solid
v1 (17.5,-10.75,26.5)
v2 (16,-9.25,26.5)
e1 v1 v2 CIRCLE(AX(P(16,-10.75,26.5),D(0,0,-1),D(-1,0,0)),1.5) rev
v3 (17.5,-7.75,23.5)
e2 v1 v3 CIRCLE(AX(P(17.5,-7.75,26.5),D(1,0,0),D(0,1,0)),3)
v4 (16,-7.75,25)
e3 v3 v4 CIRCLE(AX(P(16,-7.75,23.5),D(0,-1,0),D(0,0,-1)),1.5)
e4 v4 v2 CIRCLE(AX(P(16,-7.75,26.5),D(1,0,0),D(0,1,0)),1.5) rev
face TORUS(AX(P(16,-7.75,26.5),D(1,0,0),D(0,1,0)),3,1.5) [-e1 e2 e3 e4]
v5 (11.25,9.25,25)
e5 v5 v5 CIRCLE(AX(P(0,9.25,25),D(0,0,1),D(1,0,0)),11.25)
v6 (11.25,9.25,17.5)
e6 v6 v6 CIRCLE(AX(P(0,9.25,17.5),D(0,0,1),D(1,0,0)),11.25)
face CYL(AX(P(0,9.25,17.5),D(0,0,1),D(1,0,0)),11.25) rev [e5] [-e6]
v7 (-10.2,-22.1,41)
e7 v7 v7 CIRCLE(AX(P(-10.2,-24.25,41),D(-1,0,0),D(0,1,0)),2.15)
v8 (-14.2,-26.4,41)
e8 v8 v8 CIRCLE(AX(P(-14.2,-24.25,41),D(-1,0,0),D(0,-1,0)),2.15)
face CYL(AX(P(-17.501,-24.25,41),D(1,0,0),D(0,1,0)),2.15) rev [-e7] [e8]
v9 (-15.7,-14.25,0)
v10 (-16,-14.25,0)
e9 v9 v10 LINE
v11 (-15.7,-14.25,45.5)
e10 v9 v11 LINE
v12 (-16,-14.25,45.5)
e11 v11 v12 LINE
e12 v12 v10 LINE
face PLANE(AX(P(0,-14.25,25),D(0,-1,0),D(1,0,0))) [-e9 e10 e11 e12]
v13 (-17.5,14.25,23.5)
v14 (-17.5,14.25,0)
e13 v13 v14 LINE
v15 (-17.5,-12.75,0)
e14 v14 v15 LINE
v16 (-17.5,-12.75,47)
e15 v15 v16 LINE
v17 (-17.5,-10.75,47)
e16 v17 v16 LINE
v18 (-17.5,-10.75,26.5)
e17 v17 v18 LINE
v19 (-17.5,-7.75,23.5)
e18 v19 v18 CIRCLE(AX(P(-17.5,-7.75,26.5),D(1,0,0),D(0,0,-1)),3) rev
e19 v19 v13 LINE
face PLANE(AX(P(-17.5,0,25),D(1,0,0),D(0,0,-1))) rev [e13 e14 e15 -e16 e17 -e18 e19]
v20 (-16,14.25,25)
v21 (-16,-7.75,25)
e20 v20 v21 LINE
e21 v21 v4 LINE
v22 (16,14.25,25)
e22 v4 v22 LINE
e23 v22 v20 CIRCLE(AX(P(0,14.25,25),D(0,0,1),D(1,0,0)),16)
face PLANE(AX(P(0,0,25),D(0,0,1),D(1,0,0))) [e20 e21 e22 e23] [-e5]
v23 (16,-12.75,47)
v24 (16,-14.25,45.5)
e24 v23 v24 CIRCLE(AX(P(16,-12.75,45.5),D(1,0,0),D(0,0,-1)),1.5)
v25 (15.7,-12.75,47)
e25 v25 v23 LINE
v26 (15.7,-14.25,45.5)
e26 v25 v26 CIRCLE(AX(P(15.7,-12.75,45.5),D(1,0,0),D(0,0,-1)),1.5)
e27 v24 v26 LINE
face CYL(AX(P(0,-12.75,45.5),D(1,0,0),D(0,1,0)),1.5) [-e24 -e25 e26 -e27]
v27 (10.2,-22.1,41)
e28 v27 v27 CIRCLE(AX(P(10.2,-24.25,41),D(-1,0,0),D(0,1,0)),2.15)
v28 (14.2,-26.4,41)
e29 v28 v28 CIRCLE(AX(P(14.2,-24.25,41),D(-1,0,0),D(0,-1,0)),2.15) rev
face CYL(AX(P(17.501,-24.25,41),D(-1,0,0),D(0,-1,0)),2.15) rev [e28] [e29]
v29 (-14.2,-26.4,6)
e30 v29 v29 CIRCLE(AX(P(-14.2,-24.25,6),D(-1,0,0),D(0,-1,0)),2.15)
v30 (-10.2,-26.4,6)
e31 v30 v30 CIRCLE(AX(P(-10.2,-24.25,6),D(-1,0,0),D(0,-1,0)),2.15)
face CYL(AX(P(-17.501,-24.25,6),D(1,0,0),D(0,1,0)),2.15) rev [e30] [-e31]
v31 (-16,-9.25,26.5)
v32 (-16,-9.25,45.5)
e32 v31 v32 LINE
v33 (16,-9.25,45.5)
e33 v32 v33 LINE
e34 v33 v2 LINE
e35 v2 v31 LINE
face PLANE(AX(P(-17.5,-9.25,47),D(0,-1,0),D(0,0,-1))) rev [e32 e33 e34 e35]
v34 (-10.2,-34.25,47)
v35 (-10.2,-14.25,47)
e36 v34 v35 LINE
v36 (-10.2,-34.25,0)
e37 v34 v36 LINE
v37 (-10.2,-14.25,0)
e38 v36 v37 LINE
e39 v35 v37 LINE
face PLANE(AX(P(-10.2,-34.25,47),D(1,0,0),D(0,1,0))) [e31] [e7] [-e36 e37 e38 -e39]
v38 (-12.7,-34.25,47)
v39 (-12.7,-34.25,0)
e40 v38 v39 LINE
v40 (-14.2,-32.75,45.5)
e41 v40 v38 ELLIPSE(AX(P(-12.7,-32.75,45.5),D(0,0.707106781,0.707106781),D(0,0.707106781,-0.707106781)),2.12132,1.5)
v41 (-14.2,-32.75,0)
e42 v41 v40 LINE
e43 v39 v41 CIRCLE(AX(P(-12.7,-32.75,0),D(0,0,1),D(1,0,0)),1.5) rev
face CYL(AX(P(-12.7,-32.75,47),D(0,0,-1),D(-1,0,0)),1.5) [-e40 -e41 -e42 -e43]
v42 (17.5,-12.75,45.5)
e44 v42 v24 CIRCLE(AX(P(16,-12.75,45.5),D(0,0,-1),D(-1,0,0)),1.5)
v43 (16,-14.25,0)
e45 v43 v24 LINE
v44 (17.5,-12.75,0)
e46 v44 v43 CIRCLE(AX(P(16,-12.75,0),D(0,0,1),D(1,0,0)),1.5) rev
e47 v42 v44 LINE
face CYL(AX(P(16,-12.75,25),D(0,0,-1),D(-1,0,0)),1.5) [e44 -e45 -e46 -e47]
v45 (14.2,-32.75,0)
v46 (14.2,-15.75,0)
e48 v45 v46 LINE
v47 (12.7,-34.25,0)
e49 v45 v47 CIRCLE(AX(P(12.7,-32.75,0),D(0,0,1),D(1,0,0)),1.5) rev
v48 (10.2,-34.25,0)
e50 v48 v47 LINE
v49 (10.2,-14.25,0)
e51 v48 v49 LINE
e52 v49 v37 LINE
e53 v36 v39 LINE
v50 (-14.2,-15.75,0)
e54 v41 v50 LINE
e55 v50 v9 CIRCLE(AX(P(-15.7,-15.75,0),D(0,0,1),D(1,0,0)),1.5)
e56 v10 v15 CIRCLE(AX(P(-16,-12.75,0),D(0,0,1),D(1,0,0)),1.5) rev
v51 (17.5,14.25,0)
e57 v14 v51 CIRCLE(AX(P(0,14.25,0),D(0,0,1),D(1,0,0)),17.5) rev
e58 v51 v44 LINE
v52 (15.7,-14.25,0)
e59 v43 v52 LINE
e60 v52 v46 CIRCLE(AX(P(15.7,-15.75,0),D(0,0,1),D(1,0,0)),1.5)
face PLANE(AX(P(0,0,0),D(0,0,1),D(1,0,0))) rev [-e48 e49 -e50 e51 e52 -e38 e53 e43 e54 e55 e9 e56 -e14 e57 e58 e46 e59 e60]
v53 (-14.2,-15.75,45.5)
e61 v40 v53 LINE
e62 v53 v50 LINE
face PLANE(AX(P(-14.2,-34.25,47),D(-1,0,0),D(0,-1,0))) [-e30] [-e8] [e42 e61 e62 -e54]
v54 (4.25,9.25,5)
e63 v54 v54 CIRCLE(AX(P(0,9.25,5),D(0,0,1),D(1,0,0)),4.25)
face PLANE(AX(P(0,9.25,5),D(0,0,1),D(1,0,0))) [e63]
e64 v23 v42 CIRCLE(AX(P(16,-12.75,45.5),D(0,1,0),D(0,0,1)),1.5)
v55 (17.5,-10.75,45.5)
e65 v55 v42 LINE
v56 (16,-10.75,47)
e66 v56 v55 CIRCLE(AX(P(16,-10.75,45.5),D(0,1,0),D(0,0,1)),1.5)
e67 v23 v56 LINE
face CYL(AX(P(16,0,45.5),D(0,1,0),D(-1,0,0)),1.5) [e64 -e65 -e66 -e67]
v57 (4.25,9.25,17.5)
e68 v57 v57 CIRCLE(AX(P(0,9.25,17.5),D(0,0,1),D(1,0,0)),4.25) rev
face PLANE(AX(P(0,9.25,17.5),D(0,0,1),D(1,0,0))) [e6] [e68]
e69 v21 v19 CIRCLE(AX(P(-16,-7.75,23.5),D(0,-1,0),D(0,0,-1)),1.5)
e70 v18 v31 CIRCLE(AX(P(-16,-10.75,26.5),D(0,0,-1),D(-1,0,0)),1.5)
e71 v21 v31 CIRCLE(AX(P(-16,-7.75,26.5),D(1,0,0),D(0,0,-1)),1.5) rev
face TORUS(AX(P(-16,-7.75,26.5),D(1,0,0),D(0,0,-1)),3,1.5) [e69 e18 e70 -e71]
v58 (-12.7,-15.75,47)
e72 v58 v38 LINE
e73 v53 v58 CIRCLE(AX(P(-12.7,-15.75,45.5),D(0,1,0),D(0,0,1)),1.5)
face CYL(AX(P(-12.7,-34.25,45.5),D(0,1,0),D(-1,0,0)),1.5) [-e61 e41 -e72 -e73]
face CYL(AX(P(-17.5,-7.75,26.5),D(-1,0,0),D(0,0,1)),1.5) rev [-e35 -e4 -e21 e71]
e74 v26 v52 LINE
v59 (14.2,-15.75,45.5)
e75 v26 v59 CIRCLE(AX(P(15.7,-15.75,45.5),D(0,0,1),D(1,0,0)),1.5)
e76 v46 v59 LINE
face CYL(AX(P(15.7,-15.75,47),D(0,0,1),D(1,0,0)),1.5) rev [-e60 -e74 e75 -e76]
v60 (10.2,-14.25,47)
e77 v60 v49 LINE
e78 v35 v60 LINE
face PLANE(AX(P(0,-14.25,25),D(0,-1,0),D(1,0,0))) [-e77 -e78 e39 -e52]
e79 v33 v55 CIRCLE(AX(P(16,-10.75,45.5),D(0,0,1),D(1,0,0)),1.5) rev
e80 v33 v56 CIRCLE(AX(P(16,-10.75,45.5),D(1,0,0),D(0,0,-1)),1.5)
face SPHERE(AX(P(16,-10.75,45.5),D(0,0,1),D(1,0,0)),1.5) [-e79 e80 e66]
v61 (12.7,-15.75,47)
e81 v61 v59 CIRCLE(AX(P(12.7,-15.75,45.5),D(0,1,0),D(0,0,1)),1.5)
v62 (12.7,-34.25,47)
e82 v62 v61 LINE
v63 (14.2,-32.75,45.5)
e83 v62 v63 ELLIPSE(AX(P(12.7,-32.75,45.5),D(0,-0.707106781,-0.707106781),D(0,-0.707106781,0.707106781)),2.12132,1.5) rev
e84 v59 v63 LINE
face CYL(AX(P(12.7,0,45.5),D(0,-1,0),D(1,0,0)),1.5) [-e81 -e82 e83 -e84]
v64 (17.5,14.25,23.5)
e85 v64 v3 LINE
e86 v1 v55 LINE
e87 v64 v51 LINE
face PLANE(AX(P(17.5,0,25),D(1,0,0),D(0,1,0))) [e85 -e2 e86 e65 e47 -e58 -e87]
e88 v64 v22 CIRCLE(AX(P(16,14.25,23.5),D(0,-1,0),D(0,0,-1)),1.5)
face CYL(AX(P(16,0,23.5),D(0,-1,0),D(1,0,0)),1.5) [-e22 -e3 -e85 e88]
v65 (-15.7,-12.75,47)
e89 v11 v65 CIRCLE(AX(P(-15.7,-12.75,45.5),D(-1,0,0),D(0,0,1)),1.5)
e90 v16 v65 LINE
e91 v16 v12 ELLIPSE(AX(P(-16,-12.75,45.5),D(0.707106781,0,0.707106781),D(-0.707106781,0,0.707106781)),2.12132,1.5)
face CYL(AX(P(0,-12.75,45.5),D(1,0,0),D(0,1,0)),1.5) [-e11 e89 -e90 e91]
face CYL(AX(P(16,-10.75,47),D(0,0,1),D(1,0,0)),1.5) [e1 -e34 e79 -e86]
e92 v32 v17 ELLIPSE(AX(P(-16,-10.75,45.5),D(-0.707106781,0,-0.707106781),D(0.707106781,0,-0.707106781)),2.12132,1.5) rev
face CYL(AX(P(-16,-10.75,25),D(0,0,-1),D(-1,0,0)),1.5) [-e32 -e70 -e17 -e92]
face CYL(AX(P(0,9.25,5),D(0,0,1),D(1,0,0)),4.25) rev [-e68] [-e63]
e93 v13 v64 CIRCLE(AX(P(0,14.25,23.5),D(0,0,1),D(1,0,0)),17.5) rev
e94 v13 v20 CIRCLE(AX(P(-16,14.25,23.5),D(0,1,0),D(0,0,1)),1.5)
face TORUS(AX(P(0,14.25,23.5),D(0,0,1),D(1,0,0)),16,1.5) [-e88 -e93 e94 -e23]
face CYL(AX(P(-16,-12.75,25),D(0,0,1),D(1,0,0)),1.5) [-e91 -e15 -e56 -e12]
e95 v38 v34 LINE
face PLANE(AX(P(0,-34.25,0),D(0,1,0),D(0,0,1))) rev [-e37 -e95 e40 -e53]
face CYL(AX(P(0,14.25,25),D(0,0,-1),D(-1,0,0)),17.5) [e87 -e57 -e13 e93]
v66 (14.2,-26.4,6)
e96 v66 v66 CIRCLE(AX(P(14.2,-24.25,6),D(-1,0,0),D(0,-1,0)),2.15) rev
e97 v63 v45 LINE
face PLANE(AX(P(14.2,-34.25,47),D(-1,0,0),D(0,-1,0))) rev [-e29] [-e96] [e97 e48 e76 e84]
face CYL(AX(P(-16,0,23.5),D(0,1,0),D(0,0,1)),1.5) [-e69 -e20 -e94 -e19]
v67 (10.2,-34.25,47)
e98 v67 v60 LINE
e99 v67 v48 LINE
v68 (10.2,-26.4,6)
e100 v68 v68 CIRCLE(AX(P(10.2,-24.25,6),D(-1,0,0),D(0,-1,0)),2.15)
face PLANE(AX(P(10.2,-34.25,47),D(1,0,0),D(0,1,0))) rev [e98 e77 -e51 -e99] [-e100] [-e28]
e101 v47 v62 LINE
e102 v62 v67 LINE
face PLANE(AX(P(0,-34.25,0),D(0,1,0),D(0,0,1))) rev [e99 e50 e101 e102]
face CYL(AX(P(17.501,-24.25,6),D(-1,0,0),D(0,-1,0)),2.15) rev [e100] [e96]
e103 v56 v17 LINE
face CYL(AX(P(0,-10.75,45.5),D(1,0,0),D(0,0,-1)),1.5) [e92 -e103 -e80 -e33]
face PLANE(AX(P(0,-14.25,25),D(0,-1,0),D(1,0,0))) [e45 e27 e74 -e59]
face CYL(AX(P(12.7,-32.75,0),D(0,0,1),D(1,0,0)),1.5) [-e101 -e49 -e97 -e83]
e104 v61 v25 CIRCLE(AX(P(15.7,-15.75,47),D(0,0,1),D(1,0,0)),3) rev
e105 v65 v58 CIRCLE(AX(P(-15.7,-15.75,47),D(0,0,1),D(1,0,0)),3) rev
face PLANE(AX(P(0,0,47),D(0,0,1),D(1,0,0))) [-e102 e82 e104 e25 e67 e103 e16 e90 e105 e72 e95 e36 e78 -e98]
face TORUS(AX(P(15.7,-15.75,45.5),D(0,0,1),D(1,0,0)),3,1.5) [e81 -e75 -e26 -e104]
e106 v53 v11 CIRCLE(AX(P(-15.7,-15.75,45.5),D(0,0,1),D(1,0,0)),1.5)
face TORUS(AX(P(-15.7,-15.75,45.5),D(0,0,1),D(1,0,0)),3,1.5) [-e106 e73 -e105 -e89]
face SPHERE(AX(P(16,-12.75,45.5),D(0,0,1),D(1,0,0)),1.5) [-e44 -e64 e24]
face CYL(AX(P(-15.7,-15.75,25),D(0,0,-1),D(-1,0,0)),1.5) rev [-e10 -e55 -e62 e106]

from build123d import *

# Parameters (mm, degrees)
SKETCH1_W           = 35
SKETCH1_H           = 28.5
BOSS_EXTRUDE1_DEPTH = 25
SKETCH2_R           = 4.25
CUT_EXTRUDE1_DEPTH  = 20
SKETCH3_R           = 11.25
CUT_EXTRUDE2_DEPTH  = 7.5
SKETCH9_W           = 35
SKETCH9_H           = 5
BOSS_EXTRUDE4_DEPTH = 22
SKETCH4_W           = 4
SKETCH4_H           = 47
BOSS_EXTRUDE2_DEPTH = 20
FILLET1_R           = 1.5
CUT_EXTRUDE3_REACH  = 66.415
SKETCH6_R           = 2.15
MIRROR1_START       = -14.2
MIRROR1_OUTLINE_W   = 20
MIRROR1_OUTLINE_H   = 47
MIRROR1_OUTLINE_R   = 2.15
MIRROR1_DEPTH       = 4
MIRROR1_2_DEPTH     = 47
FILLET2_R           = 1.5


with BuildPart() as part:
    # Sketch1 → Boss-Extrude1 (new body)
    with BuildSketch(Plane.XY):
        with BuildLine():
            ThreePointArc((-17.5, 14.25), (0, 31.75), (17.5, 14.25))
            Line((17.5, 14.25), (-17.5, 14.25))
        make_face()
        Rectangle(SKETCH1_W, SKETCH1_H)
    extrude(amount=BOSS_EXTRUDE1_DEPTH)

    # Sketch2 → Cut-Extrude1 (cut)
    with BuildSketch(Plane.XY.offset(25)):
        with Locations((0, 9.25)):
            Circle(SKETCH2_R)
    extrude(amount=-CUT_EXTRUDE1_DEPTH, mode=Mode.SUBTRACT)

    # Sketch3 → Cut-Extrude2 (cut)
    with BuildSketch(Plane.XY.offset(25)):
        with Locations((0, 9.25)):
            Circle(SKETCH3_R)
    extrude(amount=-CUT_EXTRUDE2_DEPTH, mode=Mode.SUBTRACT)

    # Sketch9 → Boss-Extrude4 (add)
    with BuildSketch(Plane.XY.offset(25)):
        with Locations((0, -11.75)):
            Rectangle(SKETCH9_W, SKETCH9_H)
    extrude(amount=BOSS_EXTRUDE4_DEPTH)

    # Sketch4 → Boss-Extrude2 (add)
    with BuildSketch(Plane.XZ.offset(14.25)):
        with Locations((12.2, 23.5)):
            Rectangle(SKETCH4_W, SKETCH4_H)
    extrude(amount=BOSS_EXTRUDE2_DEPTH)

    # Fillet1
    fillet1_edges = [part.edges().sort_by_distance(p)[0] for p in [
        (14.2, -14.25, 23.5),
        (17.5, -14.25, 23.5),
    ]]
    fillet(fillet1_edges, radius=FILLET1_R)

    # Sketch6 → Cut-Extrude3 (cut, up to next)
    with BuildSketch(Plane.ZY.offset(-10.2), mode=Mode.PRIVATE) as cut_extrude3_sk1:
        with Locations(Location((6, -24.25, 0), (0, 0, 270))):
            Circle(SKETCH6_R)
    cut_extrude3_tool1 = extrude(cut_extrude3_sk1.sketch, amount=-CUT_EXTRUDE3_REACH, mode=Mode.PRIVATE) & part.part
    # Sketch6 → Cut-Extrude3 (cut, up to next)
    with BuildSketch(Plane.ZY.offset(-10.2), mode=Mode.PRIVATE) as cut_extrude3_sk2:
        with Locations(Location((41, -24.25, 0), (0, 0, 270))):
            Circle(SKETCH6_R)
    cut_extrude3_tool2 = extrude(cut_extrude3_sk2.sketch, amount=-CUT_EXTRUDE3_REACH, mode=Mode.PRIVATE) & part.part
    add(cut_extrude3_tool1.solids().sort_by_distance((10.2, -24.25, 6))[0], mode=Mode.SUBTRACT)
    add(cut_extrude3_tool2.solids().sort_by_distance((10.2, -24.25, 41))[0], mode=Mode.SUBTRACT)

    # Mirror1: read off the stored shape, not the designer's step
    # Mirror1 outline → Mirror1 (add)
    with BuildSketch(Plane.YZ.offset(MIRROR1_START)):
        with Locations((-24.25, 23.5)):
            Rectangle(MIRROR1_OUTLINE_W, MIRROR1_OUTLINE_H)
        with Locations((-24.25, 6)):
            Circle(MIRROR1_OUTLINE_R, mode=Mode.SUBTRACT)
        with Locations((-24.25, 41)):
            Circle(MIRROR1_OUTLINE_R, mode=Mode.SUBTRACT)
    extrude(amount=MIRROR1_DEPTH)

    # Mirror1 2 outline → Mirror1 2 (add)
    with BuildSketch(Plane.XY):
        with BuildLine():
            Line((-14.2, -14.25), (-15.7, -14.25))
            ThreePointArc((-15.7, -14.25), (-14.639339828, -14.689339828), (-14.2, -15.75))
            Line((-14.2, -15.75), (-14.2, -14.25))
        make_face()
    extrude(amount=MIRROR1_2_DEPTH)

    # Fillet2
    fillet2_edges = [part.edges().sort_by_distance(p)[0] for p in [
        (-17.5, 2.5, 25),
        (17.5, 2.5, 25),
        (-17.5, -9.25, 36),
        (0, -9.25, 25),
        (17.5, -9.25, 36),
        (-16.6, -14.25, 47),
        (0, -9.25, 47),
        (14.2, -25, 47),
        (14.2, -34.25, 23.5),
        (0, 31.75, 25),
        (17.5, -11, 47),
        (15.85, -14.25, 47),
        (17.060660172, -13.810660172, 47),
        (14.639339828, -14.689339828, 47),
        (-14.2, -34.25, 23.5),
        (-14.2, -25, 47),
        (-14.639339828, -14.689339828, 47),
        (-17.5, -14.25, 23.5),
    ]]
    fillet(fillet2_edges, radius=FILLET2_R)


solid = part.part
